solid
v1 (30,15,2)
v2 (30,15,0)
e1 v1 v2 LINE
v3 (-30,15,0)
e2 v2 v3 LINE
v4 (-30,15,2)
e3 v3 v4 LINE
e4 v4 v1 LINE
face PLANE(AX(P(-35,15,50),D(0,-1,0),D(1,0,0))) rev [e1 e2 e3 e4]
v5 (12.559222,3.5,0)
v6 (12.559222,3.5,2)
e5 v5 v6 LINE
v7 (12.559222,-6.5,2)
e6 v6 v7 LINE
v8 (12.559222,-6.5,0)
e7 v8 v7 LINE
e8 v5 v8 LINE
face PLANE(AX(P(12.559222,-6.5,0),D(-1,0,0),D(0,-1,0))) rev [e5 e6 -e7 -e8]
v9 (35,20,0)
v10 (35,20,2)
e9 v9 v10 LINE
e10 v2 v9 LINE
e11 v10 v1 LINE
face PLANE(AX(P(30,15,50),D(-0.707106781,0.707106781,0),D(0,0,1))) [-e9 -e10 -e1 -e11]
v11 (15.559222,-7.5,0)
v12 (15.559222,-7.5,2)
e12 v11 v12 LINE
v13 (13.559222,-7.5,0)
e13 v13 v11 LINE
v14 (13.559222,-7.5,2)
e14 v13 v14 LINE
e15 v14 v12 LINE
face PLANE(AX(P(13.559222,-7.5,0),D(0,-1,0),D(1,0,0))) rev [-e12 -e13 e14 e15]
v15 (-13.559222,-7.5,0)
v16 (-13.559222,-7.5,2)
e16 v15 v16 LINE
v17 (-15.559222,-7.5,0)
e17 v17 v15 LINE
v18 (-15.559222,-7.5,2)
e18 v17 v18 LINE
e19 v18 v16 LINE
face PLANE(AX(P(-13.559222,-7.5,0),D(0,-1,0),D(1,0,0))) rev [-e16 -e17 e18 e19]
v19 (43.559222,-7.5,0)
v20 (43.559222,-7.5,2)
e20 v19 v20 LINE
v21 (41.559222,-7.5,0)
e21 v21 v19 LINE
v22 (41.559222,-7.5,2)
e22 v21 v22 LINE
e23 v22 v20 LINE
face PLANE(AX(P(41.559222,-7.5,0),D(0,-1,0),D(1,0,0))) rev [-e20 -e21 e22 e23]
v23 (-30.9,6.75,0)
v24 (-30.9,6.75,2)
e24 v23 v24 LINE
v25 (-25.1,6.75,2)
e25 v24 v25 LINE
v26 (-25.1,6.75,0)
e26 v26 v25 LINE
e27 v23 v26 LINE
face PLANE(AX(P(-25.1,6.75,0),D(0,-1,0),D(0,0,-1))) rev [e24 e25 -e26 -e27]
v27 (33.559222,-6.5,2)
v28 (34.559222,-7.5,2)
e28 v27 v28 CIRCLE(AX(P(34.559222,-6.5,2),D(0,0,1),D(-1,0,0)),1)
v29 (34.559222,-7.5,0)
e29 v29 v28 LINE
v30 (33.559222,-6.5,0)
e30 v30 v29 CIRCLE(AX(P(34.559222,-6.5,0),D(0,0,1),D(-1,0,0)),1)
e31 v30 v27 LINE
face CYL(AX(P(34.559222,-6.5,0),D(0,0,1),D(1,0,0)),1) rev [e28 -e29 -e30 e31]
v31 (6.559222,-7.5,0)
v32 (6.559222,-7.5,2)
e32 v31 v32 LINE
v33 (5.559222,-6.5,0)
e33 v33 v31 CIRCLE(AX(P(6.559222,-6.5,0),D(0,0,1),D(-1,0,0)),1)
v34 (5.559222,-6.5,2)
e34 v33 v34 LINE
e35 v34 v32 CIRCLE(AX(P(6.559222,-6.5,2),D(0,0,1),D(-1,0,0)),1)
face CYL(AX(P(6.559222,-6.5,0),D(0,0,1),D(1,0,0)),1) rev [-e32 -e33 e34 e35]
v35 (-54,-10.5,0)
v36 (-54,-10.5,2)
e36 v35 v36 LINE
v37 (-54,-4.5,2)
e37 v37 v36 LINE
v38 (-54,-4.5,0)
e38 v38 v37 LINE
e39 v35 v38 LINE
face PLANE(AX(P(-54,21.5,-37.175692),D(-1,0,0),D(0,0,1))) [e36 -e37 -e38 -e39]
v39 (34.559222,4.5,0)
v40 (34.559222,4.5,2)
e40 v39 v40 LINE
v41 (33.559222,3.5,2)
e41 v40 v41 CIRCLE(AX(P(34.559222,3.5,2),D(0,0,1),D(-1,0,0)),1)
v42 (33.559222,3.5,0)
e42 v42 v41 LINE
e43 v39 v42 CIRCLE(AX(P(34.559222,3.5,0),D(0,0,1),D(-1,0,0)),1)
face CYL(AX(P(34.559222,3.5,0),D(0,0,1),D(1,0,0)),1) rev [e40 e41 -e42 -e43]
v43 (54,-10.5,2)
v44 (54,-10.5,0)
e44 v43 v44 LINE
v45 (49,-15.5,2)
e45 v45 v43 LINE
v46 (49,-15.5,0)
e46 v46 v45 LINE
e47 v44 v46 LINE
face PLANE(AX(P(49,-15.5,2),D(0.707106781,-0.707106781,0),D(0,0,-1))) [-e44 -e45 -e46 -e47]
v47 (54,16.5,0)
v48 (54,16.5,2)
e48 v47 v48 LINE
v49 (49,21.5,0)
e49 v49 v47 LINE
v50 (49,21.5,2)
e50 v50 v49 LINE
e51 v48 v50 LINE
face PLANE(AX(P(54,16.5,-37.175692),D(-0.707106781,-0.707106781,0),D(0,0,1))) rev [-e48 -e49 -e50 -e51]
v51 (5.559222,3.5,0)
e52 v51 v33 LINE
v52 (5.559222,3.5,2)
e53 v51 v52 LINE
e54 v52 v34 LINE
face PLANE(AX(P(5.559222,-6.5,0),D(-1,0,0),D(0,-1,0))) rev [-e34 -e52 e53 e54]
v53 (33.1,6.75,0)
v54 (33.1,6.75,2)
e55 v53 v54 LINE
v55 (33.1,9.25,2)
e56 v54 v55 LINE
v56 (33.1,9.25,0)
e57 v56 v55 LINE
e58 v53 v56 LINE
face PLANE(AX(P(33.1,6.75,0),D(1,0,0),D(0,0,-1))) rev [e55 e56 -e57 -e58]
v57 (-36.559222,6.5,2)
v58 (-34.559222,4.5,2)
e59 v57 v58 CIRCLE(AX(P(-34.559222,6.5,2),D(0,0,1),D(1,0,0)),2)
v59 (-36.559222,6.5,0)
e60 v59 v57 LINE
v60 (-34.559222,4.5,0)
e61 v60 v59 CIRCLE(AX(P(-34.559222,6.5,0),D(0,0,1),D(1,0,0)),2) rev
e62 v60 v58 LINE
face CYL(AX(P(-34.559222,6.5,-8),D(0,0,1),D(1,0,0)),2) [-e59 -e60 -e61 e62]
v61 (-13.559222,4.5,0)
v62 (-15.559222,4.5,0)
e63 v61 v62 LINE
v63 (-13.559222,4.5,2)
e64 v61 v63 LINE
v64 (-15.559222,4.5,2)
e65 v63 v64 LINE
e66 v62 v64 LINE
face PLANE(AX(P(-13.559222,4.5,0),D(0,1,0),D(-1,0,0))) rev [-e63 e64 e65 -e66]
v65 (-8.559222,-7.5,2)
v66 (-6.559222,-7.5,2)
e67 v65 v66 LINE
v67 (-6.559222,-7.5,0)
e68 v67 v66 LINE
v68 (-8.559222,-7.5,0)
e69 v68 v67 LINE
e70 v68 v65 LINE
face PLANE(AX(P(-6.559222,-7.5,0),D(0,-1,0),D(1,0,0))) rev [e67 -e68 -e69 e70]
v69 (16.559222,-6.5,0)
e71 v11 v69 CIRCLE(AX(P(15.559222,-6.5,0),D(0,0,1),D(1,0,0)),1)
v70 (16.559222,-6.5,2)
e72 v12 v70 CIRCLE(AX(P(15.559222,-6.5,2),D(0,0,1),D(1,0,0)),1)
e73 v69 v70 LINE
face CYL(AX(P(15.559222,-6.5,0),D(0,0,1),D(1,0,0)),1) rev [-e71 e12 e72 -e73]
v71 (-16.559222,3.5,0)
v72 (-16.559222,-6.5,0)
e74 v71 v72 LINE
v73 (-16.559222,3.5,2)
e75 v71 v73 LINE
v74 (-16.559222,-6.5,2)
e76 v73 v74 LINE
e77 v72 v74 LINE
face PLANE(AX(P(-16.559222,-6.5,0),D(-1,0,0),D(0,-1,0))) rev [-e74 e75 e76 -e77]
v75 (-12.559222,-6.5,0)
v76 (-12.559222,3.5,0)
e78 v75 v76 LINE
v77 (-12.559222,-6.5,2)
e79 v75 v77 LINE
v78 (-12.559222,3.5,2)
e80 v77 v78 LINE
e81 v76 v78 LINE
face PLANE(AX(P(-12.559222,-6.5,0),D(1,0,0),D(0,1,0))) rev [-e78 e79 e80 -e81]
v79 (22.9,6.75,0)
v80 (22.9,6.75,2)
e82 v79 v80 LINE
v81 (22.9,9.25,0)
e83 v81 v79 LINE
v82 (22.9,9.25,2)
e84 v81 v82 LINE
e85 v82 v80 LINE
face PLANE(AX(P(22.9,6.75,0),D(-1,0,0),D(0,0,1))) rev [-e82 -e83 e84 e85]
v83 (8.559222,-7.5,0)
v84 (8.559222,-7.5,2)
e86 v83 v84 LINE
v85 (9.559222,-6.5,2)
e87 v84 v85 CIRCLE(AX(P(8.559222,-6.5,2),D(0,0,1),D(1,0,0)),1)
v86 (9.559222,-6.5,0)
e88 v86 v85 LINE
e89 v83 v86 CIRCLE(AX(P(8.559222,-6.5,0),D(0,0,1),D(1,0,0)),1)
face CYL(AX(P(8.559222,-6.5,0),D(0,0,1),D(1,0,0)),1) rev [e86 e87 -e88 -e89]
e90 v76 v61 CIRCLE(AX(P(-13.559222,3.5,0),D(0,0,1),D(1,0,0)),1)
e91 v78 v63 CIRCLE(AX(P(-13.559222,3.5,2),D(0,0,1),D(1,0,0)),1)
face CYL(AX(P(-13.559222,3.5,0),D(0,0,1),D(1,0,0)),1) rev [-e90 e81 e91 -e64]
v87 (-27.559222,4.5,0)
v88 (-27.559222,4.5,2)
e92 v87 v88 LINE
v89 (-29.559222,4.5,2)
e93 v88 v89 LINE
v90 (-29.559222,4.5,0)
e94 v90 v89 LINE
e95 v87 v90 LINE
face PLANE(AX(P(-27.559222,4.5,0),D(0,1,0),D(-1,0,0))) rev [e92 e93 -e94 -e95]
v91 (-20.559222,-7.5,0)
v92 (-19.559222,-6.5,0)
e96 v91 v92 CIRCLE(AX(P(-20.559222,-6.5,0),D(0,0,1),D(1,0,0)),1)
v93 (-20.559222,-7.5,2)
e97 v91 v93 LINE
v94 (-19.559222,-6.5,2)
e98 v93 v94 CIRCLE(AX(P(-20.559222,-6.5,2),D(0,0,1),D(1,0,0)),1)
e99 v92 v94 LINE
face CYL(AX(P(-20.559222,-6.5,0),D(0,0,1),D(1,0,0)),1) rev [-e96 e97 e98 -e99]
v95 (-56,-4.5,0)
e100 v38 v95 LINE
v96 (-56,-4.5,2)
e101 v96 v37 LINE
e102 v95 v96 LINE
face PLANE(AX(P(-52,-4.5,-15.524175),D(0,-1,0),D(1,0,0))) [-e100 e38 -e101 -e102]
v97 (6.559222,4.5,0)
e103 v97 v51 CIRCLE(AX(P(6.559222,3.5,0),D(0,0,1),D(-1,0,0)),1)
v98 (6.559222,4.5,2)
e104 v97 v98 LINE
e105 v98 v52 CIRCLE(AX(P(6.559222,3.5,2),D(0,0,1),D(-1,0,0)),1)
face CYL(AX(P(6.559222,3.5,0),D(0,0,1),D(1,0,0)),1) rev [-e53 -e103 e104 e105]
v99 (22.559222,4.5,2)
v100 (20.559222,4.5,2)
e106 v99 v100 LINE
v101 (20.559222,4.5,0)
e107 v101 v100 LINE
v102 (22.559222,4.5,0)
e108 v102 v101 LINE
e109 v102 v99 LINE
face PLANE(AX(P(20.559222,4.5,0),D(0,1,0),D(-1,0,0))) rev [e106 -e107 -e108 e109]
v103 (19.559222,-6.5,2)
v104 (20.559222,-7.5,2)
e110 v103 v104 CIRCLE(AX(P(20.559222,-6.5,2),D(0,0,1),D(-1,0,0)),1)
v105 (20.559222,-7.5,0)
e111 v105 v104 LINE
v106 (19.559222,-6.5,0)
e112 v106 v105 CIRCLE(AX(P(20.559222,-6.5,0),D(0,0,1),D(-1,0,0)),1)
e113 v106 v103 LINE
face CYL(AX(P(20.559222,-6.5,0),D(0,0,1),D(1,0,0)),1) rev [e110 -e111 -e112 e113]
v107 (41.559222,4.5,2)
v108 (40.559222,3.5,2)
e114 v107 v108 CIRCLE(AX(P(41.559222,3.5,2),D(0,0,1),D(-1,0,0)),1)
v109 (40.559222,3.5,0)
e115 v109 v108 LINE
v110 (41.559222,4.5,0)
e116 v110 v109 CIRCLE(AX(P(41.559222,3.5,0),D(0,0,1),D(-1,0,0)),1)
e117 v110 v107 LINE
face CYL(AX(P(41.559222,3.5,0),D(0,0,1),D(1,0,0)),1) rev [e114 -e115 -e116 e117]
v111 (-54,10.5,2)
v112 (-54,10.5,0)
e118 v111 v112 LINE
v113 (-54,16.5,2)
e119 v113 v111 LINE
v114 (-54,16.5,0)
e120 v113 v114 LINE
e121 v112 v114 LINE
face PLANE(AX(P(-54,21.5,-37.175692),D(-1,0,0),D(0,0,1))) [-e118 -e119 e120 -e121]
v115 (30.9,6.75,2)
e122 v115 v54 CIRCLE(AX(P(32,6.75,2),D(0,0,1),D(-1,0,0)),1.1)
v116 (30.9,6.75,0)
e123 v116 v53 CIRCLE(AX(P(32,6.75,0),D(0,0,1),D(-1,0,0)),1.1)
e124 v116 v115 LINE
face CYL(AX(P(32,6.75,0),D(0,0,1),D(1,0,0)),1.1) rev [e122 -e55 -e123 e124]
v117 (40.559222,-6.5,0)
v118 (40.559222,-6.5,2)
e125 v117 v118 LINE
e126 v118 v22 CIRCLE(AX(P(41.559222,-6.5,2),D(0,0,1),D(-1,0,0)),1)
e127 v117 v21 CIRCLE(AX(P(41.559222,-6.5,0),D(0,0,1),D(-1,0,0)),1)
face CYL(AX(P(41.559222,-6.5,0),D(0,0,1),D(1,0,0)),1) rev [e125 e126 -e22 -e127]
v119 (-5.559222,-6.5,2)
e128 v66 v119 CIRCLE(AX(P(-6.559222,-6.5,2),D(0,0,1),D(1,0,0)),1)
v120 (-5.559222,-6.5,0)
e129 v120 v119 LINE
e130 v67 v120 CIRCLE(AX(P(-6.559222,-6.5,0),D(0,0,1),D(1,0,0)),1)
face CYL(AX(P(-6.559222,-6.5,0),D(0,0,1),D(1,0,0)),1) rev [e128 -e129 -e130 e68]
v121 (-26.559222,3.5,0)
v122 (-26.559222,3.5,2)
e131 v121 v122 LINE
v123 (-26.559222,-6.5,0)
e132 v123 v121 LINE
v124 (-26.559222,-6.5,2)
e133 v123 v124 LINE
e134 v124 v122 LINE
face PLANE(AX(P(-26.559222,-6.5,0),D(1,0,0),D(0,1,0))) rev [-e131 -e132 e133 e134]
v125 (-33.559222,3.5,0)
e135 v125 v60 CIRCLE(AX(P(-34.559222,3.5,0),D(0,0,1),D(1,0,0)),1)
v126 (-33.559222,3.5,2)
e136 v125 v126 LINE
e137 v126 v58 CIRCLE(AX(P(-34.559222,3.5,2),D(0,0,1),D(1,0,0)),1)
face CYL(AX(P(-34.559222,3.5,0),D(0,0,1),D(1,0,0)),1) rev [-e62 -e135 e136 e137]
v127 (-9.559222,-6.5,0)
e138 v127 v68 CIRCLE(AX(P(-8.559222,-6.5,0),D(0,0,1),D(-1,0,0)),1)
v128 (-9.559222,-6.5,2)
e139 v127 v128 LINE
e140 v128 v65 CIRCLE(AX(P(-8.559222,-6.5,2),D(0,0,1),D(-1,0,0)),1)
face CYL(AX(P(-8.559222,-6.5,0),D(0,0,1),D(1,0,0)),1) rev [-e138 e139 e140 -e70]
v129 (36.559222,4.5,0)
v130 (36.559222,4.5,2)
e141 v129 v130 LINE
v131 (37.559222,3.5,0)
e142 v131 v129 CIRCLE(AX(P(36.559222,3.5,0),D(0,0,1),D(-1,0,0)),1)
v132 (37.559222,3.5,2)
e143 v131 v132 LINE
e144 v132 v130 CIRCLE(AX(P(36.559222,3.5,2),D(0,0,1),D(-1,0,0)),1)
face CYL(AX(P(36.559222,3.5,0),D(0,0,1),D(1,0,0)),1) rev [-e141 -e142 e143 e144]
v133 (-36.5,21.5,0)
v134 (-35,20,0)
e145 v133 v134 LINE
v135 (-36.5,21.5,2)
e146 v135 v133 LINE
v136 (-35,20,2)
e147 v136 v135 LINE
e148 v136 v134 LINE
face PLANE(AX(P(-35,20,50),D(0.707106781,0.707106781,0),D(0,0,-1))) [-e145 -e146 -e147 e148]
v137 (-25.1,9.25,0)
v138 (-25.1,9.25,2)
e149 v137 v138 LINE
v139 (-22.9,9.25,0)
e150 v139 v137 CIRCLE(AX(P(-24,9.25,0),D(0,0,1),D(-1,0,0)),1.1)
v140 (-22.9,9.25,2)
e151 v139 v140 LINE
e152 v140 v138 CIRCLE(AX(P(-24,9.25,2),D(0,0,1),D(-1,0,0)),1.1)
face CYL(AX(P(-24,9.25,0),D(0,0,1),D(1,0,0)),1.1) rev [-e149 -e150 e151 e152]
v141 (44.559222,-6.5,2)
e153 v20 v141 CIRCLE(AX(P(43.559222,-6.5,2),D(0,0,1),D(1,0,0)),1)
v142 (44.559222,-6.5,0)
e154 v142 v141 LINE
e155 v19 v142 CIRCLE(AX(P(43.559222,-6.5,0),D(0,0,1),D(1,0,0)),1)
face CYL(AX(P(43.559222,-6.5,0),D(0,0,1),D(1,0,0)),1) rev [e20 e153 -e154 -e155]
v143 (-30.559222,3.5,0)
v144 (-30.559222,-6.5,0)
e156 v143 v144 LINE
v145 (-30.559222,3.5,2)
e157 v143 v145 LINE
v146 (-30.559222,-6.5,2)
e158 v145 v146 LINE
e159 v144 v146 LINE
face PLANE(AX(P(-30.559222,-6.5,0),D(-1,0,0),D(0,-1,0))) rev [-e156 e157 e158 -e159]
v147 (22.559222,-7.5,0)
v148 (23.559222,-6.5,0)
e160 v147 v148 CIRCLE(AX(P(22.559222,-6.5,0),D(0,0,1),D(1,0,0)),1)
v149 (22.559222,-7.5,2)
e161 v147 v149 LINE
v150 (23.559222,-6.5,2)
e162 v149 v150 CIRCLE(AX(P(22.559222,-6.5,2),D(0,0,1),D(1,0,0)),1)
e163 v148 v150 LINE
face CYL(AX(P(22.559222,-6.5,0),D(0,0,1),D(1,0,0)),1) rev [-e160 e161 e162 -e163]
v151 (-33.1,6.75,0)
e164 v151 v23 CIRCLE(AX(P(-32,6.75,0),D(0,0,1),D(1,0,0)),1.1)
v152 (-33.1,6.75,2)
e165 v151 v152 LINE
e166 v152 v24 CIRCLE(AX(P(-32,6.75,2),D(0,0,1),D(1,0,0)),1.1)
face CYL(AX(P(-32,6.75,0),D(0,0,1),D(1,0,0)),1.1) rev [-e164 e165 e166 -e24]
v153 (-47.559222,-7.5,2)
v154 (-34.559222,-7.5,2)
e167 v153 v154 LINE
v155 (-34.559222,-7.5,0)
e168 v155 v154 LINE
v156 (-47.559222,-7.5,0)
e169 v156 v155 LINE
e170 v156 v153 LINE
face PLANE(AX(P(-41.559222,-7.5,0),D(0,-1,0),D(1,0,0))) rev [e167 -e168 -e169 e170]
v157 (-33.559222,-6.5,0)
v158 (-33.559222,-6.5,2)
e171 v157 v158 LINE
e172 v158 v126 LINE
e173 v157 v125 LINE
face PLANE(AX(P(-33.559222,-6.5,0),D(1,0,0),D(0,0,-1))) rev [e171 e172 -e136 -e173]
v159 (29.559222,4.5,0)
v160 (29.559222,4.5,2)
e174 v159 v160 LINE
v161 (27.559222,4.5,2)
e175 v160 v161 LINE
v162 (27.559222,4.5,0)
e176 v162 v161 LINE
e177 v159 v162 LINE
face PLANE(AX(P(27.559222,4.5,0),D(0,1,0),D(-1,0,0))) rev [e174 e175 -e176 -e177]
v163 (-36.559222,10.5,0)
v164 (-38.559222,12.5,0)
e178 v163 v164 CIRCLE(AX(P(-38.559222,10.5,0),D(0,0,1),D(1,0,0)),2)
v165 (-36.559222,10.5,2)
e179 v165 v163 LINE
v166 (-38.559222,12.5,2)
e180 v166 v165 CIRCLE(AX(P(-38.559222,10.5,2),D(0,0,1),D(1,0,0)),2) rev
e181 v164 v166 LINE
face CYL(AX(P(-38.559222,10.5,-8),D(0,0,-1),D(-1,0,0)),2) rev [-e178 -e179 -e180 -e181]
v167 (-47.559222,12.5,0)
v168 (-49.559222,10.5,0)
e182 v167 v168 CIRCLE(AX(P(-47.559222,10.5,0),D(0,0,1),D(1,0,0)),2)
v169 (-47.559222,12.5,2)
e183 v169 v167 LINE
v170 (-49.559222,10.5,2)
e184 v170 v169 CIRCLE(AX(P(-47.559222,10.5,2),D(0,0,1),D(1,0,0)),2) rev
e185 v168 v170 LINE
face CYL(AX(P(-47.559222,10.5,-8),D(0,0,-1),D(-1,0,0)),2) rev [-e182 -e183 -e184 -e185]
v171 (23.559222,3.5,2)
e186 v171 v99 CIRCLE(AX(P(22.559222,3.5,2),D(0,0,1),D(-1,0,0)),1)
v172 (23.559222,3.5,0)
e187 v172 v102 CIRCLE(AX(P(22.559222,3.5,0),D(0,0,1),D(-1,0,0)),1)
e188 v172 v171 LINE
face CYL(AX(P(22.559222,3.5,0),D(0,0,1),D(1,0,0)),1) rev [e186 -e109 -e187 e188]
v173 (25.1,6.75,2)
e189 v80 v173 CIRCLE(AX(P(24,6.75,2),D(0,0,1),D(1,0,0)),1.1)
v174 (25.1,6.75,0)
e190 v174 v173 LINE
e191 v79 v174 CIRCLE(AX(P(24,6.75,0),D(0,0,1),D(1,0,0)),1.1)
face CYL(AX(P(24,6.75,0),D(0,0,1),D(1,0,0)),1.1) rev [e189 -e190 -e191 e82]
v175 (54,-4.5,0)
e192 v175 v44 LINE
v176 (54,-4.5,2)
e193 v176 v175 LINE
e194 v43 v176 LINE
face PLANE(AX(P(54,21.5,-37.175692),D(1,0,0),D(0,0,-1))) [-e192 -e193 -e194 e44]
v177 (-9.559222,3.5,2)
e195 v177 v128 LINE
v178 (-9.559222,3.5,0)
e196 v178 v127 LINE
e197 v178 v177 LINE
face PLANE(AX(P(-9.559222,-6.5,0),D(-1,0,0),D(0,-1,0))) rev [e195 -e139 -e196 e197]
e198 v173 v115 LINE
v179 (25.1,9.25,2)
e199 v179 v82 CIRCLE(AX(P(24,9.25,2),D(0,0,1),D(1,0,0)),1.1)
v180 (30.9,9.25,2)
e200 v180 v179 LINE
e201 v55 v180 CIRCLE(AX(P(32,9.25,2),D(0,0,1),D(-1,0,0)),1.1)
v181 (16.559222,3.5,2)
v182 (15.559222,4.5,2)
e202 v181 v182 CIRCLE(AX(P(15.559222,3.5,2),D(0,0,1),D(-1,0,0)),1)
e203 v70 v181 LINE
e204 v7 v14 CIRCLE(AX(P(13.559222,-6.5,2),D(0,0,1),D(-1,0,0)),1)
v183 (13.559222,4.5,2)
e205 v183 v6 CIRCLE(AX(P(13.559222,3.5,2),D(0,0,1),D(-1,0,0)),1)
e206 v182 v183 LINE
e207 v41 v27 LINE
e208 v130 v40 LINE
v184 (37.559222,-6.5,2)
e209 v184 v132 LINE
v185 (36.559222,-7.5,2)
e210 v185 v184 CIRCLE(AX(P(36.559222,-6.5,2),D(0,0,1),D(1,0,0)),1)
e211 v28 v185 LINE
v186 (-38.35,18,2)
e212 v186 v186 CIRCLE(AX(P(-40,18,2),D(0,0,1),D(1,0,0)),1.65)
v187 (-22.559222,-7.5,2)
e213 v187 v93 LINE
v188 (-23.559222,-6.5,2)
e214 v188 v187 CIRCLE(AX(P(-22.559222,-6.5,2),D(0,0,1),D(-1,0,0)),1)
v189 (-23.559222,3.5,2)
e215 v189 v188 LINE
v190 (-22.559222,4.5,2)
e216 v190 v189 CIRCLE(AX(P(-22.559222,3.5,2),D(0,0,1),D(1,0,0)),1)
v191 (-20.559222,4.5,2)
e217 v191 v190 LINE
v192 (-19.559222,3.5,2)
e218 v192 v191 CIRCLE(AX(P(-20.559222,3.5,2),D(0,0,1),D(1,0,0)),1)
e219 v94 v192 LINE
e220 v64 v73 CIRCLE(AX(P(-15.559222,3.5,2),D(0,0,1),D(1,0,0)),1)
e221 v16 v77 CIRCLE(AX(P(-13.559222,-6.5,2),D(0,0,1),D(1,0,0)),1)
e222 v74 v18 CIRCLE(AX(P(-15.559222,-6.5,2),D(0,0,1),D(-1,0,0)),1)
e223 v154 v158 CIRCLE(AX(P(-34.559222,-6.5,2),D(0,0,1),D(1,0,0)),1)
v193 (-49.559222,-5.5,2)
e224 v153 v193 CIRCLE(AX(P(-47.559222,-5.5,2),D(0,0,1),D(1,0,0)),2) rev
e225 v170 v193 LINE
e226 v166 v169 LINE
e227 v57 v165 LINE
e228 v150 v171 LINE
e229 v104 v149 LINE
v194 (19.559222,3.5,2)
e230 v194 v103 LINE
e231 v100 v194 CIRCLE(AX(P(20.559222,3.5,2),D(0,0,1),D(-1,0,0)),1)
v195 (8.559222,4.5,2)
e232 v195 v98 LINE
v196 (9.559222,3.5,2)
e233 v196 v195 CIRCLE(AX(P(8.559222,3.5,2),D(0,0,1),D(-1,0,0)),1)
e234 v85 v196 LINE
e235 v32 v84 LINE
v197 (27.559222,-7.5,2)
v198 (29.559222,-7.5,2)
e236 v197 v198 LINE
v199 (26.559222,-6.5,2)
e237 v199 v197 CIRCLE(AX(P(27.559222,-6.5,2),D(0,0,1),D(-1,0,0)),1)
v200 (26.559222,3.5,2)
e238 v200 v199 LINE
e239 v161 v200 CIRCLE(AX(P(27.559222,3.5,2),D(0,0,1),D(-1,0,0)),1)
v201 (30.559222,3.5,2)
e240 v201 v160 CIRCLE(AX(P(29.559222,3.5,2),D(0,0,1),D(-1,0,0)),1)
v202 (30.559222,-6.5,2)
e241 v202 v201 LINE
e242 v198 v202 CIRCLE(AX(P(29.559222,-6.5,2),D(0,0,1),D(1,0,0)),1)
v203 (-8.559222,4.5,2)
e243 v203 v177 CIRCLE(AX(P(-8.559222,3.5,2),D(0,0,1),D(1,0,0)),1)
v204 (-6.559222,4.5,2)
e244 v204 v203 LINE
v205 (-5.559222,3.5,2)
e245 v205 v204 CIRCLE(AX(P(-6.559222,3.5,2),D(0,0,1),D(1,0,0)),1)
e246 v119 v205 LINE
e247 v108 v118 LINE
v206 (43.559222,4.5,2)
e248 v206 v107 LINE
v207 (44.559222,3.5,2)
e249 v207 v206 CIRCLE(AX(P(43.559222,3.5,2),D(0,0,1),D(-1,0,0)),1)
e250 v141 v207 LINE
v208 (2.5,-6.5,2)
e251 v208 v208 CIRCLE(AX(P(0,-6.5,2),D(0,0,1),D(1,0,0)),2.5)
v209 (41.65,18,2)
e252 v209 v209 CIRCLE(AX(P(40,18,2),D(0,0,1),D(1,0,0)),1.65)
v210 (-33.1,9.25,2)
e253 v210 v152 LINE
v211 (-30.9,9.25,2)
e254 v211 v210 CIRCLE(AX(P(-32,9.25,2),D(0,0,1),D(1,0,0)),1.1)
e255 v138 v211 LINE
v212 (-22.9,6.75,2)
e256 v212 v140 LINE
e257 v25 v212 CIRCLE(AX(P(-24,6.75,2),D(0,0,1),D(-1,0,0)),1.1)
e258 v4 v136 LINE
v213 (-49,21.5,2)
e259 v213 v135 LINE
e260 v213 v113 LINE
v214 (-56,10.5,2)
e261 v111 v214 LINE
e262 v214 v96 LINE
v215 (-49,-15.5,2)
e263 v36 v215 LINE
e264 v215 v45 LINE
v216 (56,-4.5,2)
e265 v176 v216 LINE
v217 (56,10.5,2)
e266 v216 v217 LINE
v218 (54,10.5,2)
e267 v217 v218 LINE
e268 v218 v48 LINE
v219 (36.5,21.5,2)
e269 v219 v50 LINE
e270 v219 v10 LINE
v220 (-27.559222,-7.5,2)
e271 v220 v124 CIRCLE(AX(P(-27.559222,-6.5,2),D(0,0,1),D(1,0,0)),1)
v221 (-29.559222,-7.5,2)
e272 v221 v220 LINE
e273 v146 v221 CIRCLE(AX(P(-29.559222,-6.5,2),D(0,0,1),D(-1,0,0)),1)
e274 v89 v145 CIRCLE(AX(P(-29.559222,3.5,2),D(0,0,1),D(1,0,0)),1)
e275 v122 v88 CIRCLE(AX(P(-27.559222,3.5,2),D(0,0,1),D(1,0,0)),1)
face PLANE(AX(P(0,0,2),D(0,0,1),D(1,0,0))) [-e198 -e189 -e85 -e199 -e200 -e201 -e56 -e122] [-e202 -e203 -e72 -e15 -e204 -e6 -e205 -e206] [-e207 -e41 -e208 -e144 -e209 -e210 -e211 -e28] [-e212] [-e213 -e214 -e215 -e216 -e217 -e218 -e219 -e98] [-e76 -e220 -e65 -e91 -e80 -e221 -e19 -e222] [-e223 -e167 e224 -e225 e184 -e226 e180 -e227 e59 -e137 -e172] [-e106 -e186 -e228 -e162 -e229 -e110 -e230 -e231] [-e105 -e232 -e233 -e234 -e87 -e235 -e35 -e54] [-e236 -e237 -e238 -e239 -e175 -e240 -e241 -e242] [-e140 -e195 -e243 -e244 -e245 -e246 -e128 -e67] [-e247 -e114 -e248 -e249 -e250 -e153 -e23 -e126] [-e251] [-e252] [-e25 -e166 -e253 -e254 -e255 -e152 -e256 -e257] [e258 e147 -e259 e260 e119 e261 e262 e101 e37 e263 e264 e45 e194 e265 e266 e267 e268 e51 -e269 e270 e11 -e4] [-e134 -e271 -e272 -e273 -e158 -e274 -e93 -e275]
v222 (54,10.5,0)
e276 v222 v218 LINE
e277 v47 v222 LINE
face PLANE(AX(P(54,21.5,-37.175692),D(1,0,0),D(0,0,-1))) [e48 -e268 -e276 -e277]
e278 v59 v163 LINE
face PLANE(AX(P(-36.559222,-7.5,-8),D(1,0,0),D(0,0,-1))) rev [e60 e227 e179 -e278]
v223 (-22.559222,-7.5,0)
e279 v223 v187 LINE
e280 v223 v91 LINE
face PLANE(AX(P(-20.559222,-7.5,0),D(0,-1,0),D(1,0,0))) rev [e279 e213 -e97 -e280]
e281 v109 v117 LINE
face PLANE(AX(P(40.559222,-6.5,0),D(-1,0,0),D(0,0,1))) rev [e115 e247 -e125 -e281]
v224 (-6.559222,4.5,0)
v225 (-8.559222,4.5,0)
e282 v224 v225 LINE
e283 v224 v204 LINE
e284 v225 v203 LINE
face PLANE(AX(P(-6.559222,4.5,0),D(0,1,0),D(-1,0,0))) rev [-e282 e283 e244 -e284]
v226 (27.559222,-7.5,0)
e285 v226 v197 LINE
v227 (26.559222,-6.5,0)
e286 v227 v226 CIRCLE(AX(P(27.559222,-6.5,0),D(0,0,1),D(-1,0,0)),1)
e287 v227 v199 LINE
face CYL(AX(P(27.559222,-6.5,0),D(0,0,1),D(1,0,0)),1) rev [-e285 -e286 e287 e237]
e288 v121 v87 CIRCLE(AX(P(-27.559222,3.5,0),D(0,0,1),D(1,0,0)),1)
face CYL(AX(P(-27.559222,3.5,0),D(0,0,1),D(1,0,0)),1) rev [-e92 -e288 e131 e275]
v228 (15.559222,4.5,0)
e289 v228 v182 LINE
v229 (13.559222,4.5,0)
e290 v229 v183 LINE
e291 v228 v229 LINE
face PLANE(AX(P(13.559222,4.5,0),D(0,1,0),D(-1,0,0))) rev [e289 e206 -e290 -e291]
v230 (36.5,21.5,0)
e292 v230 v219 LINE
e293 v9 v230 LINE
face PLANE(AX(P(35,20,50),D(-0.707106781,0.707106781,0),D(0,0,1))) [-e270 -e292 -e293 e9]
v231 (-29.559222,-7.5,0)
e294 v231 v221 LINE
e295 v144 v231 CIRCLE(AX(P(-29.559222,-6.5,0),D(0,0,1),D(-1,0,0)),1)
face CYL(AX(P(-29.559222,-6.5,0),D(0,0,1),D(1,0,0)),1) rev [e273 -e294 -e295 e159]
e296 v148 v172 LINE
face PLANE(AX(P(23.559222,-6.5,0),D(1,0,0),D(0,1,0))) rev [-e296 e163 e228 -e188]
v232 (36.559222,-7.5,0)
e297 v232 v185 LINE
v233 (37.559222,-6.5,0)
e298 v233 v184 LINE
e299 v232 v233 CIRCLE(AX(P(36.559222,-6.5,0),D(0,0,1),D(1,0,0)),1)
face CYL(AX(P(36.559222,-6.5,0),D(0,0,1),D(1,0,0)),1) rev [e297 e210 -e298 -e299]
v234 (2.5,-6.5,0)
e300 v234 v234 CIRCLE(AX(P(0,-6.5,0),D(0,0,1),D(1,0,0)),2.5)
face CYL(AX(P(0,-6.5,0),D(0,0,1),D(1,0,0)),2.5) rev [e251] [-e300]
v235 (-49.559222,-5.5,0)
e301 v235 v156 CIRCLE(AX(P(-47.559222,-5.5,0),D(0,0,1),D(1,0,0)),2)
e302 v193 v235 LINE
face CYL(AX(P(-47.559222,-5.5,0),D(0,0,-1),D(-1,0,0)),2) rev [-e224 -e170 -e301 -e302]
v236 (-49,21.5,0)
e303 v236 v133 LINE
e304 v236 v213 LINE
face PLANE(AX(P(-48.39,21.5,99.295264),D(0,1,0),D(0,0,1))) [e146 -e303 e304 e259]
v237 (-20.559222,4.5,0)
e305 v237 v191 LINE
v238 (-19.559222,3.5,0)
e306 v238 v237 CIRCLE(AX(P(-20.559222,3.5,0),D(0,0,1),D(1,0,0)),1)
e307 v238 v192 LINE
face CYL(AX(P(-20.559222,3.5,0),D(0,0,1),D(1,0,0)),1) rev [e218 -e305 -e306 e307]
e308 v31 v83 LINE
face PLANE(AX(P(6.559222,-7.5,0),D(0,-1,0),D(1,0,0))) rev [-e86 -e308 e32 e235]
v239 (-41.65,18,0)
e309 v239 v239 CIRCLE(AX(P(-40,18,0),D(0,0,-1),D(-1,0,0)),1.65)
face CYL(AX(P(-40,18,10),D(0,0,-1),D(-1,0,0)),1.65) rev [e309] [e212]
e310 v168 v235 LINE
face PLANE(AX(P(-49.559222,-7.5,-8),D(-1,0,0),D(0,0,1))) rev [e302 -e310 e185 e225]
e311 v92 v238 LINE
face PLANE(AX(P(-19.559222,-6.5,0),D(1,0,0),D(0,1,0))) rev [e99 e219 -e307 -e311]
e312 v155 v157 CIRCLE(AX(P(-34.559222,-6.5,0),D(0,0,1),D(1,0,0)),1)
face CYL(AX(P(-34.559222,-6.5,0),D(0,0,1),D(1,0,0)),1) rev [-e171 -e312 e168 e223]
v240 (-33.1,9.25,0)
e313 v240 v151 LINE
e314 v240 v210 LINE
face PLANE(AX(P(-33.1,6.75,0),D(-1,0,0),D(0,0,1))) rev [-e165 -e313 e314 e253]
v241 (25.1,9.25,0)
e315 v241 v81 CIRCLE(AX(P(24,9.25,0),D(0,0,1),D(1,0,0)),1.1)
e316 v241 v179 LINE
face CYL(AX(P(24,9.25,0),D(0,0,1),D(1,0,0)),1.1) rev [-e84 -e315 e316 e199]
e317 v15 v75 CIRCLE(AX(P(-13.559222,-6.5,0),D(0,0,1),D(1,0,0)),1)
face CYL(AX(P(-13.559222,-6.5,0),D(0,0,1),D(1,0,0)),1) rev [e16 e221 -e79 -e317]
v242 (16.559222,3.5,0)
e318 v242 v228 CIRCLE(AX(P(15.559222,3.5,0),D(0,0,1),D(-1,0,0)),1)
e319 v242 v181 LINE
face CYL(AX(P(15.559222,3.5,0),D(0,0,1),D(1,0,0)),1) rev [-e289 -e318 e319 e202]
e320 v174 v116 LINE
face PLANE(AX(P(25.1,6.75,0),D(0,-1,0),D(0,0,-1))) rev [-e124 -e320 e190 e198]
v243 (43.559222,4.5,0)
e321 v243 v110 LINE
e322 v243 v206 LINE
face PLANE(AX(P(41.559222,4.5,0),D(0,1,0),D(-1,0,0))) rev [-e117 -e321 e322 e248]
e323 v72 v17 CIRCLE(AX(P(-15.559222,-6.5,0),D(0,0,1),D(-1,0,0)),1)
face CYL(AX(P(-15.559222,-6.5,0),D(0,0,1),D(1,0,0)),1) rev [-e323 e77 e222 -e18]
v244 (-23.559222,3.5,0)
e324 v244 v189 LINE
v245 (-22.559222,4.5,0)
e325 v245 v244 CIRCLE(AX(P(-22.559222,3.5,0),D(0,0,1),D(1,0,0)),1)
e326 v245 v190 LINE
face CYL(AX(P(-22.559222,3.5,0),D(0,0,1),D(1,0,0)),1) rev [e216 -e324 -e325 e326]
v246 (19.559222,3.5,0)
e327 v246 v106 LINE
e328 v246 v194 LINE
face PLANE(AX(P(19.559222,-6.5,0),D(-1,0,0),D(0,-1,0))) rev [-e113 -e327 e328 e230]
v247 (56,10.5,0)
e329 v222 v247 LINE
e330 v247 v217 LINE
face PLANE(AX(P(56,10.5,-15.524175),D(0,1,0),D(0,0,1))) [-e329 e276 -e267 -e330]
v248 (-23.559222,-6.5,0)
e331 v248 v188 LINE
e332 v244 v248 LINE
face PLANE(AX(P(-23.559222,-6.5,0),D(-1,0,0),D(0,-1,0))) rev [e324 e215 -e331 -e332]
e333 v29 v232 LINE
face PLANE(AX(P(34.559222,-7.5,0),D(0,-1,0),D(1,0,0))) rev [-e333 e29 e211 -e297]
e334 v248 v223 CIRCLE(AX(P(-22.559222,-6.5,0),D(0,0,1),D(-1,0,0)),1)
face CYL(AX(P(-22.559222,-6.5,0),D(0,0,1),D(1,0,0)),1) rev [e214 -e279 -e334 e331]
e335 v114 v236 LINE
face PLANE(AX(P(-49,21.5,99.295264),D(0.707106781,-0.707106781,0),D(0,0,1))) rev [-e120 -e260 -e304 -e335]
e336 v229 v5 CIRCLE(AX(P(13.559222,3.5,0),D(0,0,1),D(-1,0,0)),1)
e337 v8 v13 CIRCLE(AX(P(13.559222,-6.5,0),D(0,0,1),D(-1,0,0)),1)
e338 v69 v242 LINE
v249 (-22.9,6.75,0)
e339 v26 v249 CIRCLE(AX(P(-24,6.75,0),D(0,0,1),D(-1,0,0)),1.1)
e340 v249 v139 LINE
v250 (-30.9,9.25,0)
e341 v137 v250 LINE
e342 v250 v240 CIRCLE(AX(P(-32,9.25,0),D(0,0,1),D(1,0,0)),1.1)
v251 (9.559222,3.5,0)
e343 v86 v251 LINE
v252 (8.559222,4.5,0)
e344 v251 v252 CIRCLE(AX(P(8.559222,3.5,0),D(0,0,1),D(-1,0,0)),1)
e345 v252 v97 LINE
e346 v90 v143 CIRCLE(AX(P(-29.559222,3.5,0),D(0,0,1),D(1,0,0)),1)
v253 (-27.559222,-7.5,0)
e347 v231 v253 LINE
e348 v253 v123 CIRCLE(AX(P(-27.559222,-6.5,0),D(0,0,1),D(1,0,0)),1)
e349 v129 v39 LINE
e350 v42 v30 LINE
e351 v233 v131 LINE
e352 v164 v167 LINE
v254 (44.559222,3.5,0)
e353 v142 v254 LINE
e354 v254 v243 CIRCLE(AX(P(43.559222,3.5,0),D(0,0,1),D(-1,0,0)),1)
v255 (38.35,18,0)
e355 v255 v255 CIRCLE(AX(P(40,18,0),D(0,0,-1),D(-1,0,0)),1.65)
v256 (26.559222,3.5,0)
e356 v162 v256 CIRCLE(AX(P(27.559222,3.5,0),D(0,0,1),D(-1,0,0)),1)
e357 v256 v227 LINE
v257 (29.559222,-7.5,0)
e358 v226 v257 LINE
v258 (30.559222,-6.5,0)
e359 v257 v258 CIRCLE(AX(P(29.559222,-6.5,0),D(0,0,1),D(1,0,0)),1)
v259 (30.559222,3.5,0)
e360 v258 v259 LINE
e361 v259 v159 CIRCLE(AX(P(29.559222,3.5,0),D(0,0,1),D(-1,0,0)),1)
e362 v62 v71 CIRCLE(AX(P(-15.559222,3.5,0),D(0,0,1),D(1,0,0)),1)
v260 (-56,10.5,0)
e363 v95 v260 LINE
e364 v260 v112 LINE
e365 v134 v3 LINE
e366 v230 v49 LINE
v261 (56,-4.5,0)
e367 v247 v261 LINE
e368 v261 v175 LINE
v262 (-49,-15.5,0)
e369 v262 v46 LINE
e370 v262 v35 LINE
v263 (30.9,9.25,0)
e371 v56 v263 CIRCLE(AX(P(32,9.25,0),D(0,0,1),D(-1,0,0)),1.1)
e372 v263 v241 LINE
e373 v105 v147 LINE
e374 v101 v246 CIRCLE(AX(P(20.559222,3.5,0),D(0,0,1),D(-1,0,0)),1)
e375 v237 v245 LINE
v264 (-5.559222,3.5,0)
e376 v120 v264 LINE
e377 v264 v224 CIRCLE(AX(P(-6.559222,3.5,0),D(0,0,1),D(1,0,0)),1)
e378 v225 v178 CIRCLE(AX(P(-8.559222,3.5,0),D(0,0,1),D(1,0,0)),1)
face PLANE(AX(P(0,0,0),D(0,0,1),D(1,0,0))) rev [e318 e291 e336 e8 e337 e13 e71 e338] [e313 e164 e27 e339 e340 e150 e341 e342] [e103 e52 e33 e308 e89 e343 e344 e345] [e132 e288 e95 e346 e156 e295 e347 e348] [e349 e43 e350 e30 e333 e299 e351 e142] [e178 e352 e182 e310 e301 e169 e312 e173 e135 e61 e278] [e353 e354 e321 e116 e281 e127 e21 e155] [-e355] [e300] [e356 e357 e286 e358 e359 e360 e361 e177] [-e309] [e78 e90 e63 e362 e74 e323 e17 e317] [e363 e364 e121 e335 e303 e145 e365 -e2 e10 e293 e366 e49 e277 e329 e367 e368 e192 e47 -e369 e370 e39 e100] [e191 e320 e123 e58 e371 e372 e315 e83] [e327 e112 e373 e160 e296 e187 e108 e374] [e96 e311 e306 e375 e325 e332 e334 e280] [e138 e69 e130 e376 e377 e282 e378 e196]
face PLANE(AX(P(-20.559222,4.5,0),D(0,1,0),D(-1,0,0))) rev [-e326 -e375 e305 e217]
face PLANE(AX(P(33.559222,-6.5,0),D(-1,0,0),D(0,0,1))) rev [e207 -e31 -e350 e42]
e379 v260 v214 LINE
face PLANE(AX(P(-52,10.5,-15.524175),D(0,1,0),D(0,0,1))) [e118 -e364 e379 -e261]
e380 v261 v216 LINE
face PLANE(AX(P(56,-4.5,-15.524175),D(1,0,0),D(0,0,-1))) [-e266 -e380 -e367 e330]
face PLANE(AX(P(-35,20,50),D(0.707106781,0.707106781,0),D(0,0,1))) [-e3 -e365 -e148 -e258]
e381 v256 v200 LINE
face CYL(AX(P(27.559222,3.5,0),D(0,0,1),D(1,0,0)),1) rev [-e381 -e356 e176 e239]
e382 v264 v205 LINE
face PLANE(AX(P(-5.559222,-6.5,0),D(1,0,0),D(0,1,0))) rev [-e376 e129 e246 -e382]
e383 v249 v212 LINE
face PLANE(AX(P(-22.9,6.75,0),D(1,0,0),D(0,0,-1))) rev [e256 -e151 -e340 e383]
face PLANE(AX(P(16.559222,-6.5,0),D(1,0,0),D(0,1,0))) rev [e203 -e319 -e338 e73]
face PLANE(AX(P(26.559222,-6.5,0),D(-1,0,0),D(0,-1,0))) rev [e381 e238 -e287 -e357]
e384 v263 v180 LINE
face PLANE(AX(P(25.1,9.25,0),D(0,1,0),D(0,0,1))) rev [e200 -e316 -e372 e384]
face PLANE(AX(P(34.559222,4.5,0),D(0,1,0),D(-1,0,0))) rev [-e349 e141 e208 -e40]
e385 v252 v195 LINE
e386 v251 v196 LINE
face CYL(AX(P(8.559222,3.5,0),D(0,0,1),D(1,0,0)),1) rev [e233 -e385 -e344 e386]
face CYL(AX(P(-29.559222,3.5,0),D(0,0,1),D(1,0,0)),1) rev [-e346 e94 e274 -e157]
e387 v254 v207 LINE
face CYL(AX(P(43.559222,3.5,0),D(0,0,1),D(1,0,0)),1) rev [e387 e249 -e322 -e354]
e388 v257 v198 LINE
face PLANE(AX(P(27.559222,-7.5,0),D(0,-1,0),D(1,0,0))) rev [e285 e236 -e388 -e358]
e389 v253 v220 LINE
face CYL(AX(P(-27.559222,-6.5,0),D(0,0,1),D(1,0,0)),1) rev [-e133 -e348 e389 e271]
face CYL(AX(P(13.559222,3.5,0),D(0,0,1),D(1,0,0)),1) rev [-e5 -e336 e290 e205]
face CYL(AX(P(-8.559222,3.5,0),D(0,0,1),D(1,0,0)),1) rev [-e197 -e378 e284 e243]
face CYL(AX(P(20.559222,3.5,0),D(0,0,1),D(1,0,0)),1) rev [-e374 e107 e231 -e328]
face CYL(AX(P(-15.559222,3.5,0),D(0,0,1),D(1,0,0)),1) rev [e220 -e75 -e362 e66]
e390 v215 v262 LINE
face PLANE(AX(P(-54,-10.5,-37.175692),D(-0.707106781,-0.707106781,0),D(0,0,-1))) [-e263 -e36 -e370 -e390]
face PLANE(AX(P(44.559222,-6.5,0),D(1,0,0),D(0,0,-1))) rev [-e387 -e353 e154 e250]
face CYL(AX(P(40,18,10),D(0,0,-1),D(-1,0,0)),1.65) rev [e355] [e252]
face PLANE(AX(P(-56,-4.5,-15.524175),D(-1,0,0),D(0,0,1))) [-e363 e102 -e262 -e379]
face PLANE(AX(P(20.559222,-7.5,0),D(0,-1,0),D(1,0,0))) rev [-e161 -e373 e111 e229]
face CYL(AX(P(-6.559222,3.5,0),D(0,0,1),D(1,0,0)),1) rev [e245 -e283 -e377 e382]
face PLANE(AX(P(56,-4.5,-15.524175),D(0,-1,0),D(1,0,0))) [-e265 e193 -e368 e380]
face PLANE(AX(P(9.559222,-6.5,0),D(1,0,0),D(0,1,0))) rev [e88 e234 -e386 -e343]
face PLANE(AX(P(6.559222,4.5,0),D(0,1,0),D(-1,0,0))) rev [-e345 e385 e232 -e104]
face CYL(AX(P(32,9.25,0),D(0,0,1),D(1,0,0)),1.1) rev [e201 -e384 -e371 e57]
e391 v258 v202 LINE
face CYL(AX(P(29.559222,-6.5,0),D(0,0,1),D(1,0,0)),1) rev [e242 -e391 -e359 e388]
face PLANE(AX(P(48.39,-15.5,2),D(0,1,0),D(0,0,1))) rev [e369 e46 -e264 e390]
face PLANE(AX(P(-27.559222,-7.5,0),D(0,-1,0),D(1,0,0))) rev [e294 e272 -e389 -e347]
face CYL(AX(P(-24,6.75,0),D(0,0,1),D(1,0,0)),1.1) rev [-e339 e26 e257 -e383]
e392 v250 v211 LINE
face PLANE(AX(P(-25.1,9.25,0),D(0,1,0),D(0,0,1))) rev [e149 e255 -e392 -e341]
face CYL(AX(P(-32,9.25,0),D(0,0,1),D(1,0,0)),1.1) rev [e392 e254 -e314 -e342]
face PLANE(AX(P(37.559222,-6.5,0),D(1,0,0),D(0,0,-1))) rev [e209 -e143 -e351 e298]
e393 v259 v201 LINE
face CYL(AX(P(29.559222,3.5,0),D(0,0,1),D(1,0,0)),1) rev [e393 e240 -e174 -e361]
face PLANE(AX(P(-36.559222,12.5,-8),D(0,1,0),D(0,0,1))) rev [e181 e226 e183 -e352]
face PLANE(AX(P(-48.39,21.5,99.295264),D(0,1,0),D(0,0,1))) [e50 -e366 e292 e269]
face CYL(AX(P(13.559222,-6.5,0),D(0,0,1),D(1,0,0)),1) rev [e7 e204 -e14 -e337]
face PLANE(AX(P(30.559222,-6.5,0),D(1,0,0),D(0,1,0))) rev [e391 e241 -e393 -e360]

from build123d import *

# Parameters (mm, degrees)
SKETCH_1_W           = 105
SKETCH_1_H           = 43
EXTRUDE_1_DEPTH      = 2
SKETCH_2_R           = 2.5
CUT_EXTRUDE_1_DEPTH  = 2
SKETCH_3_R           = 1.65
CUT_EXTRUDE_2_DEPTH  = 2
CUT_EXTRUDE_3_DEPTH  = 2
CUT_EXTRUDE_4_DEPTH  = 2
SKETCH_7_W           = 119.420279411
SKETCH_7_H           = 10
CUT_EXTRUDE_6_DEPTH  = 2
SKETCH_8_W           = 4.11
SKETCH_8_H           = 33
CUT_EXTRUDE_7_DEPTH  = 2
SKETCH_11_W          = 2
SKETCH_11_H          = 15
EXTRUDE_2_DEPTH      = 2
SKETCH_13_W          = 96.78
SKETCH_13_H          = 6
CUT_EXTRUDE_8_DEPTH  = 2
SKETCH_14_W          = 96.78
SKETCH_14_H          = 10
EXTRUDE_3_DEPTH      = 2
SKETCH_15_R          = 1.65
CUT_EXTRUDE_9_DEPTH  = 10
SKETCH_17_W          = 70
SKETCH_17_H          = 13
CUT_EXTRUDE_10_DEPTH = 50
SKETCH_18_W          = 2
SKETCH_18_H          = 13
SKETCH_18_H_2        = 9
EXTRUDE_4_DEPTH      = 2
SKETCH_19_W          = 2
SKETCH_19_H          = 13
SKETCH_19_H_2        = 9
EXTRUDE_5_DEPTH      = 2
SKETCH_20_W          = 3.61
SKETCH_20_H          = 37
EXTRUDE_6_DEPTH      = 2
SKETCH_21_W          = 4
SKETCH_21_H          = 15
EXTRUDE_7_DEPTH      = 2
CHAMFER_1_SIZE       = 5
CHAMFER_2_SIZE       = 1.5
SKETCH_23_W          = 13
SKETCH_23_H          = 20
CUT_EXTRUDE_12_DEPTH = 10
FILLET_2_R           = 2


with BuildPart() as part:
    # 草图1 → 凸台-拉伸1 (new body)
    with BuildSketch(Plane.XY):
        Rectangle(SKETCH_1_W, SKETCH_1_H)
    extrude(amount=EXTRUDE_1_DEPTH)

    # 草图2 → 切除-拉伸1 (cut)
    with BuildSketch(Plane.XY.offset(2)):
        with Locations((0, -6.5)):
            Circle(SKETCH_2_R)
    extrude(amount=-CUT_EXTRUDE_1_DEPTH, mode=Mode.SUBTRACT)

    # 草图3 → 切除-拉伸2 (cut)
    with BuildSketch(Plane.XY.offset(2)):
        with Locations((-40, -18.5)):
            Circle(SKETCH_3_R)
        with Locations((-40, 13.5)):
            Circle(SKETCH_3_R)
        with Locations(Location((40, 13.5, 0), (0, 0, 180))):
            Circle(SKETCH_3_R)
        with Locations(Location((40, -18.5, 0), (0, 0, 180))):
            Circle(SKETCH_3_R)
    extrude(amount=-CUT_EXTRUDE_2_DEPTH, mode=Mode.SUBTRACT)

    # 草图4 → 切除-拉伸3 (cut)
    with BuildSketch(Plane.XY.offset(2)):
        with BuildLine():
            Line((-6.55922156, -7.5), (-8.55922156, -7.5))
            ThreePointArc((-8.55922156, -7.5), (-9.266328341, -7.207106781), (-9.55922156, -6.5))
            Line((-9.55922156, -6.5), (-9.55922156, 3.5))
            ThreePointArc((-9.55922156, 3.5), (-9.266328341, 4.207106781), (-8.55922156, 4.5))
            Line((-8.55922156, 4.5), (-6.55922156, 4.5))
            ThreePointArc((-6.55922156, 4.5), (-5.852114779, 4.207106781), (-5.55922156, 3.5))
            Line((-5.55922156, 3.5), (-5.55922156, -6.5))
            ThreePointArc((-5.55922156, -6.5), (-5.852114779, -7.207106781), (-6.55922156, -7.5))
        make_face()
        with BuildLine():
            Line((-12.55922156, -6.5), (-12.55922156, 3.5))
            ThreePointArc((-12.55922156, 3.5), (-12.852114779, 4.207106781), (-13.55922156, 4.5))
            Line((-13.55922156, 4.5), (-15.55922156, 4.5))
            ThreePointArc((-15.55922156, 4.5), (-16.266328341, 4.207106781), (-16.55922156, 3.5))
            Line((-16.55922156, 3.5), (-16.55922156, -6.5))
            ThreePointArc((-16.55922156, -6.5), (-16.266328341, -7.207106781), (-15.55922156, -7.5))
            Line((-15.55922156, -7.5), (-13.55922156, -7.5))
            ThreePointArc((-13.55922156, -7.5), (-12.852114779, -7.207106781), (-12.55922156, -6.5))
        make_face()
        with BuildLine():
            Line((-19.55922156, -6.5), (-19.55922156, 3.5))
            ThreePointArc((-19.55922156, 3.5), (-19.852114779, 4.207106781), (-20.55922156, 4.5))
            Line((-20.55922156, 4.5), (-22.55922156, 4.5))
            ThreePointArc((-22.55922156, 4.5), (-23.266328341, 4.207106781), (-23.55922156, 3.5))
            Line((-23.55922156, 3.5), (-23.55922156, -6.5))
            ThreePointArc((-23.55922156, -6.5), (-23.266328341, -7.207106781), (-22.55922156, -7.5))
            Line((-22.55922156, -7.5), (-20.55922156, -7.5))
            ThreePointArc((-20.55922156, -7.5), (-19.852114779, -7.207106781), (-19.55922156, -6.5))
        make_face()
        with BuildLine():
            Line((-26.55922156, -6.5), (-26.55922156, 3.5))
            ThreePointArc((-26.55922156, 3.5), (-26.852114779, 4.207106781), (-27.55922156, 4.5))
            Line((-27.55922156, 4.5), (-29.55922156, 4.5))
            ThreePointArc((-29.55922156, 4.5), (-30.266328341, 4.207106781), (-30.55922156, 3.5))
            Line((-30.55922156, 3.5), (-30.55922156, -6.5))
            ThreePointArc((-30.55922156, -6.5), (-30.266328341, -7.207106781), (-29.55922156, -7.5))
            Line((-29.55922156, -7.5), (-27.55922156, -7.5))
            ThreePointArc((-27.55922156, -7.5), (-26.852114779, -7.207106781), (-26.55922156, -6.5))
        make_face()
        with BuildLine():
            Line((-33.55922156, -6.5), (-33.55922156, 3.5))
            ThreePointArc((-33.55922156, 3.5), (-33.852114779, 4.207106781), (-34.55922156, 4.5))
            Line((-34.55922156, 4.5), (-36.55922156, 4.5))
            ThreePointArc((-36.55922156, 4.5), (-37.266328341, 4.207106781), (-37.55922156, 3.5))
            Line((-37.55922156, 3.5), (-37.55922156, -6.5))
            ThreePointArc((-37.55922156, -6.5), (-37.266328341, -7.207106781), (-36.55922156, -7.5))
            Line((-36.55922156, -7.5), (-34.55922156, -7.5))
            ThreePointArc((-34.55922156, -7.5), (-33.852114779, -7.207106781), (-33.55922156, -6.5))
        make_face()
        with BuildLine():
            Line((-40.55922156, -6.5), (-40.55922156, 3.5))
            ThreePointArc((-40.55922156, 3.5), (-40.852114779, 4.207106781), (-41.55922156, 4.5))
            Line((-41.55922156, 4.5), (-43.55922156, 4.5))
            ThreePointArc((-43.55922156, 4.5), (-44.266328341, 4.207106781), (-44.55922156, 3.5))
            Line((-44.55922156, 3.5), (-44.55922156, -6.5))
            ThreePointArc((-44.55922156, -6.5), (-44.266328341, -7.207106781), (-43.55922156, -7.5))
            Line((-43.55922156, -7.5), (-41.55922156, -7.5))
            ThreePointArc((-41.55922156, -7.5), (-40.852114779, -7.207106781), (-40.55922156, -6.5))
        make_face()
        with BuildLine():
            Line((41.55922156, 4.5), (43.55922156, 4.5))
            ThreePointArc((43.55922156, 4.5), (44.266328341, 4.207106781), (44.55922156, 3.5))
            Line((44.55922156, 3.5), (44.55922156, -6.5))
            ThreePointArc((44.55922156, -6.5), (44.266328341, -7.207106781), (43.55922156, -7.5))
            Line((43.55922156, -7.5), (41.55922156, -7.5))
            ThreePointArc((41.55922156, -7.5), (40.852114779, -7.207106781), (40.55922156, -6.5))
            Line((40.55922156, -6.5), (40.55922156, 3.5))
            ThreePointArc((40.55922156, 3.5), (40.852114779, 4.207106781), (41.55922156, 4.5))
        make_face()
        with BuildLine():
            Line((34.55922156, 4.5), (36.55922156, 4.5))
            ThreePointArc((36.55922156, 4.5), (37.266328341, 4.207106781), (37.55922156, 3.5))
            Line((37.55922156, 3.5), (37.55922156, -6.5))
            ThreePointArc((37.55922156, -6.5), (37.266328341, -7.207106781), (36.55922156, -7.5))
            Line((36.55922156, -7.5), (34.55922156, -7.5))
            ThreePointArc((34.55922156, -7.5), (33.852114779, -7.207106781), (33.55922156, -6.5))
            Line((33.55922156, -6.5), (33.55922156, 3.5))
            ThreePointArc((33.55922156, 3.5), (33.852114779, 4.207106781), (34.55922156, 4.5))
        make_face()
        with BuildLine():
            Line((27.55922156, 4.5), (29.55922156, 4.5))
            ThreePointArc((29.55922156, 4.5), (30.266328341, 4.207106781), (30.55922156, 3.5))
            Line((30.55922156, 3.5), (30.55922156, -6.5))
            ThreePointArc((30.55922156, -6.5), (30.266328341, -7.207106781), (29.55922156, -7.5))
            Line((29.55922156, -7.5), (27.55922156, -7.5))
            ThreePointArc((27.55922156, -7.5), (26.852114779, -7.207106781), (26.55922156, -6.5))
            Line((26.55922156, -6.5), (26.55922156, 3.5))
            ThreePointArc((26.55922156, 3.5), (26.852114779, 4.207106781), (27.55922156, 4.5))
        make_face()
        with BuildLine():
            Line((20.55922156, 4.5), (22.55922156, 4.5))
            ThreePointArc((22.55922156, 4.5), (23.266328341, 4.207106781), (23.55922156, 3.5))
            Line((23.55922156, 3.5), (23.55922156, -6.5))
            ThreePointArc((23.55922156, -6.5), (23.266328341, -7.207106781), (22.55922156, -7.5))
            Line((22.55922156, -7.5), (20.55922156, -7.5))
            ThreePointArc((20.55922156, -7.5), (19.852114779, -7.207106781), (19.55922156, -6.5))
            Line((19.55922156, -6.5), (19.55922156, 3.5))
            ThreePointArc((19.55922156, 3.5), (19.852114779, 4.207106781), (20.55922156, 4.5))
        make_face()
        with BuildLine():
            Line((13.55922156, 4.5), (15.55922156, 4.5))
            ThreePointArc((15.55922156, 4.5), (16.266328341, 4.207106781), (16.55922156, 3.5))
            Line((16.55922156, 3.5), (16.55922156, -6.5))
            ThreePointArc((16.55922156, -6.5), (16.266328341, -7.207106781), (15.55922156, -7.5))
            Line((15.55922156, -7.5), (13.55922156, -7.5))
            ThreePointArc((13.55922156, -7.5), (12.852114779, -7.207106781), (12.55922156, -6.5))
            Line((12.55922156, -6.5), (12.55922156, 3.5))
            ThreePointArc((12.55922156, 3.5), (12.852114779, 4.207106781), (13.55922156, 4.5))
        make_face()
        with BuildLine():
            Line((9.55922156, -6.5), (9.55922156, 3.5))
            ThreePointArc((9.55922156, 3.5), (9.266328341, 4.207106781), (8.55922156, 4.5))
            Line((8.55922156, 4.5), (6.55922156, 4.5))
            ThreePointArc((6.55922156, 4.5), (5.852114779, 4.207106781), (5.55922156, 3.5))
            Line((5.55922156, 3.5), (5.55922156, -6.5))
            ThreePointArc((5.55922156, -6.5), (5.852114779, -7.207106781), (6.55922156, -7.5))
            Line((6.55922156, -7.5), (8.55922156, -7.5))
            ThreePointArc((8.55922156, -7.5), (9.266328341, -7.207106781), (9.55922156, -6.5))
        make_face()
    extrude(amount=-CUT_EXTRUDE_3_DEPTH, mode=Mode.SUBTRACT)

    # 草图5 → 切除-拉伸4 (cut)
    with BuildSketch(Plane.XY.offset(2)):
        with BuildLine():
            Line((-25.100000106, 6.749999873), (-30.900000106, 6.749999873))
            ThreePointArc((-30.900000106, 6.749999873), (-32.000000106, 5.649999873), (-33.100000106, 6.749999873))
            Line((-33.100000106, 6.749999873), (-33.100000106, 9.249999977))
            ThreePointArc((-33.100000106, 9.249999977), (-32.000000106, 10.349999977), (-30.900000106, 9.249999977))
            Line((-30.900000106, 9.249999977), (-25.100000106, 9.249999977))
            ThreePointArc((-25.100000106, 9.249999977), (-24.000000156, 10.349999977), (-22.900000106, 9.250000075))
            Line((-22.900000106, 9.250000075), (-22.900000106, 6.750000075))
            ThreePointArc((-22.900000106, 6.750000075), (-24.000000005, 5.649999873), (-25.100000106, 6.749999873))
        make_face()
        with BuildLine():
            Line((22.900000106, 6.750000075), (22.900000106, 9.250000075))
            ThreePointArc((22.900000106, 9.250000075), (24.000000156, 10.349999977), (25.100000106, 9.249999977))
            Line((25.100000106, 9.249999977), (30.900000106, 9.249999977))
            ThreePointArc((30.900000106, 9.249999977), (32.000000106, 10.349999977), (33.100000106, 9.249999977))
            Line((33.100000106, 9.249999977), (33.100000106, 6.749999873))
            ThreePointArc((33.100000106, 6.749999873), (32.000000106, 5.649999873), (30.900000106, 6.749999873))
            Line((30.900000106, 6.749999873), (25.100000106, 6.749999873))
            ThreePointArc((25.100000106, 6.749999873), (24.000000005, 5.649999873), (22.900000106, 6.750000075))
        make_face()
    extrude(amount=-CUT_EXTRUDE_4_DEPTH, mode=Mode.SUBTRACT)

    # 草图7 → 切除-拉伸6 (cut)
    with BuildSketch(Plane.XY.offset(2)):
        with Locations((5.815039628, 16.5)):
            Rectangle(SKETCH_7_W, SKETCH_7_H)
    extrude(amount=-CUT_EXTRUDE_6_DEPTH, mode=Mode.SUBTRACT)

    # 草图8 → 切除-拉伸7 (cut)
    with BuildSketch(Plane.XY.offset(2)):
        with Locations((-50.445, -5)):
            Rectangle(SKETCH_8_W, SKETCH_8_H)
        with Locations((50.445, -5)):
            Rectangle(SKETCH_8_W, SKETCH_8_H)
    extrude(amount=-CUT_EXTRUDE_7_DEPTH, mode=Mode.SUBTRACT)

    # 草图11 → 凸台-拉伸2 (add)
    with BuildSketch(Plane.XY.offset(2)):
        with Locations((-49.39, 1)):
            Rectangle(SKETCH_11_W, SKETCH_11_H)
        with Locations((49.39, 1)):
            Rectangle(SKETCH_11_W, SKETCH_11_H)
    extrude(amount=-EXTRUDE_2_DEPTH)

    # 草图13 → 切除-拉伸8 (cut)
    with BuildSketch(Plane(origin=(0, 0, 0), x_dir=(-1, 0, 0), z_dir=(0, 0, -1))):
        with Locations((0, -18.5)):
            Rectangle(SKETCH_13_W, SKETCH_13_H)
    extrude(amount=-CUT_EXTRUDE_8_DEPTH, mode=Mode.SUBTRACT)

    # 草图14 → 凸台-拉伸3 (add)
    with BuildSketch(Plane(origin=(0, 0, 0), x_dir=(-1, 0, 0), z_dir=(0, 0, -1))):
        with Locations((0, 16.5)):
            Rectangle(SKETCH_14_W, SKETCH_14_H)
    extrude(amount=-EXTRUDE_3_DEPTH)

    # 草图15 → 切除-拉伸9 (cut)
    with BuildSketch(Plane(origin=(0, 0, 0), x_dir=(-1, 0, 0), z_dir=(0, 0, -1))):
        with Locations((-40, 18)):
            Circle(SKETCH_15_R)
        with Locations((40, 18)):
            Circle(SKETCH_15_R)
    extrude(amount=-CUT_EXTRUDE_9_DEPTH, mode=Mode.SUBTRACT)

    # 草图17 → 切除-拉伸10 (cut)
    with BuildSketch(Plane(origin=(0, 0, 0), x_dir=(-1, 0, 0), z_dir=(0, 0, -1))):
        with Locations((0, 21.5)):
            Rectangle(SKETCH_17_W, SKETCH_17_H)
    extrude(amount=-CUT_EXTRUDE_10_DEPTH, mode=Mode.SUBTRACT)

    # 草图18 → 凸台-拉伸4 (add)
    with BuildSketch(Plane.ZY.offset(48.39)):
        with Locations((1, 15)):
            Rectangle(SKETCH_18_W, SKETCH_18_H)
        with Locations((1, -11)):
            Rectangle(SKETCH_18_W, SKETCH_18_H_2)
    extrude(amount=EXTRUDE_4_DEPTH)

    # 草图19 → 凸台-拉伸5 (add)
    with BuildSketch(Plane(origin=(48.39, 0, 0), x_dir=(0, 0, -1), z_dir=(1, 0, 0))):
        with Locations((-1, 15)):
            Rectangle(SKETCH_19_W, SKETCH_19_H)
        with Locations((-1, -11)):
            Rectangle(SKETCH_19_W, SKETCH_19_H_2)
    extrude(amount=EXTRUDE_5_DEPTH)

    # 草图20 → 凸台-拉伸6 (add)
    with BuildSketch(Plane.XY.offset(2)):
        with Locations((-52.195, 3)):
            Rectangle(SKETCH_20_W, SKETCH_20_H)
        with Locations((52.195, 3)):
            Rectangle(SKETCH_20_W, SKETCH_20_H)
    extrude(amount=-EXTRUDE_6_DEPTH)

    # 草图21 → 凸台-拉伸7 (add)
    with BuildSketch(Plane.XY.offset(2)):
        with Locations((-54, 3)):
            Rectangle(SKETCH_21_W, SKETCH_21_H)
        with Locations((54, 3)):
            Rectangle(SKETCH_21_W, SKETCH_21_H)
    extrude(amount=-EXTRUDE_7_DEPTH)

    # 倒角1
    chamfer_1_edges = [part.edges().sort_by_distance(p)[0] for p in [
        (35, 15, 1),
        (-35, 15, 1),
        (-54, -15.5, 1),
        (-54, 21.5, 1),
        (54, 21.5, 1),
        (54, -15.5, 1),
    ]]
    chamfer(chamfer_1_edges, length=CHAMFER_1_SIZE)

    # 倒角2
    chamfer_2_edges = [part.edges().sort_by_distance(p)[0] for p in [
        (-35, 21.5, 1),
        (35, 21.5, 1),
    ]]
    chamfer(chamfer_2_edges, length=CHAMFER_2_SIZE - 0.0001)  # a hair under: the kernel refuses the full size

    # 草图23 → 切除-拉伸12 (cut)
    with BuildSketch(Plane.XY.offset(2)):
        with Locations((-43.05922156, 2.5)):
            Rectangle(SKETCH_23_W, SKETCH_23_H)
    extrude(amount=-CUT_EXTRUDE_12_DEPTH, mode=Mode.SUBTRACT)

    # 圆角2
    fillet_2_edges = [part.edges().sort_by_distance(p)[0] for p in [
        (-49.55922156, -7.5, 1),
        (-49.55922156, 12.5, 1),
        (-36.55922156, 12.5, 1),
        (-36.55922156, 4.5, 1),
    ]]
    fillet(fillet_2_edges, radius=FILLET_2_R - 0.0001)  # a hair under: the kernel refuses the full size


solid = part.part
